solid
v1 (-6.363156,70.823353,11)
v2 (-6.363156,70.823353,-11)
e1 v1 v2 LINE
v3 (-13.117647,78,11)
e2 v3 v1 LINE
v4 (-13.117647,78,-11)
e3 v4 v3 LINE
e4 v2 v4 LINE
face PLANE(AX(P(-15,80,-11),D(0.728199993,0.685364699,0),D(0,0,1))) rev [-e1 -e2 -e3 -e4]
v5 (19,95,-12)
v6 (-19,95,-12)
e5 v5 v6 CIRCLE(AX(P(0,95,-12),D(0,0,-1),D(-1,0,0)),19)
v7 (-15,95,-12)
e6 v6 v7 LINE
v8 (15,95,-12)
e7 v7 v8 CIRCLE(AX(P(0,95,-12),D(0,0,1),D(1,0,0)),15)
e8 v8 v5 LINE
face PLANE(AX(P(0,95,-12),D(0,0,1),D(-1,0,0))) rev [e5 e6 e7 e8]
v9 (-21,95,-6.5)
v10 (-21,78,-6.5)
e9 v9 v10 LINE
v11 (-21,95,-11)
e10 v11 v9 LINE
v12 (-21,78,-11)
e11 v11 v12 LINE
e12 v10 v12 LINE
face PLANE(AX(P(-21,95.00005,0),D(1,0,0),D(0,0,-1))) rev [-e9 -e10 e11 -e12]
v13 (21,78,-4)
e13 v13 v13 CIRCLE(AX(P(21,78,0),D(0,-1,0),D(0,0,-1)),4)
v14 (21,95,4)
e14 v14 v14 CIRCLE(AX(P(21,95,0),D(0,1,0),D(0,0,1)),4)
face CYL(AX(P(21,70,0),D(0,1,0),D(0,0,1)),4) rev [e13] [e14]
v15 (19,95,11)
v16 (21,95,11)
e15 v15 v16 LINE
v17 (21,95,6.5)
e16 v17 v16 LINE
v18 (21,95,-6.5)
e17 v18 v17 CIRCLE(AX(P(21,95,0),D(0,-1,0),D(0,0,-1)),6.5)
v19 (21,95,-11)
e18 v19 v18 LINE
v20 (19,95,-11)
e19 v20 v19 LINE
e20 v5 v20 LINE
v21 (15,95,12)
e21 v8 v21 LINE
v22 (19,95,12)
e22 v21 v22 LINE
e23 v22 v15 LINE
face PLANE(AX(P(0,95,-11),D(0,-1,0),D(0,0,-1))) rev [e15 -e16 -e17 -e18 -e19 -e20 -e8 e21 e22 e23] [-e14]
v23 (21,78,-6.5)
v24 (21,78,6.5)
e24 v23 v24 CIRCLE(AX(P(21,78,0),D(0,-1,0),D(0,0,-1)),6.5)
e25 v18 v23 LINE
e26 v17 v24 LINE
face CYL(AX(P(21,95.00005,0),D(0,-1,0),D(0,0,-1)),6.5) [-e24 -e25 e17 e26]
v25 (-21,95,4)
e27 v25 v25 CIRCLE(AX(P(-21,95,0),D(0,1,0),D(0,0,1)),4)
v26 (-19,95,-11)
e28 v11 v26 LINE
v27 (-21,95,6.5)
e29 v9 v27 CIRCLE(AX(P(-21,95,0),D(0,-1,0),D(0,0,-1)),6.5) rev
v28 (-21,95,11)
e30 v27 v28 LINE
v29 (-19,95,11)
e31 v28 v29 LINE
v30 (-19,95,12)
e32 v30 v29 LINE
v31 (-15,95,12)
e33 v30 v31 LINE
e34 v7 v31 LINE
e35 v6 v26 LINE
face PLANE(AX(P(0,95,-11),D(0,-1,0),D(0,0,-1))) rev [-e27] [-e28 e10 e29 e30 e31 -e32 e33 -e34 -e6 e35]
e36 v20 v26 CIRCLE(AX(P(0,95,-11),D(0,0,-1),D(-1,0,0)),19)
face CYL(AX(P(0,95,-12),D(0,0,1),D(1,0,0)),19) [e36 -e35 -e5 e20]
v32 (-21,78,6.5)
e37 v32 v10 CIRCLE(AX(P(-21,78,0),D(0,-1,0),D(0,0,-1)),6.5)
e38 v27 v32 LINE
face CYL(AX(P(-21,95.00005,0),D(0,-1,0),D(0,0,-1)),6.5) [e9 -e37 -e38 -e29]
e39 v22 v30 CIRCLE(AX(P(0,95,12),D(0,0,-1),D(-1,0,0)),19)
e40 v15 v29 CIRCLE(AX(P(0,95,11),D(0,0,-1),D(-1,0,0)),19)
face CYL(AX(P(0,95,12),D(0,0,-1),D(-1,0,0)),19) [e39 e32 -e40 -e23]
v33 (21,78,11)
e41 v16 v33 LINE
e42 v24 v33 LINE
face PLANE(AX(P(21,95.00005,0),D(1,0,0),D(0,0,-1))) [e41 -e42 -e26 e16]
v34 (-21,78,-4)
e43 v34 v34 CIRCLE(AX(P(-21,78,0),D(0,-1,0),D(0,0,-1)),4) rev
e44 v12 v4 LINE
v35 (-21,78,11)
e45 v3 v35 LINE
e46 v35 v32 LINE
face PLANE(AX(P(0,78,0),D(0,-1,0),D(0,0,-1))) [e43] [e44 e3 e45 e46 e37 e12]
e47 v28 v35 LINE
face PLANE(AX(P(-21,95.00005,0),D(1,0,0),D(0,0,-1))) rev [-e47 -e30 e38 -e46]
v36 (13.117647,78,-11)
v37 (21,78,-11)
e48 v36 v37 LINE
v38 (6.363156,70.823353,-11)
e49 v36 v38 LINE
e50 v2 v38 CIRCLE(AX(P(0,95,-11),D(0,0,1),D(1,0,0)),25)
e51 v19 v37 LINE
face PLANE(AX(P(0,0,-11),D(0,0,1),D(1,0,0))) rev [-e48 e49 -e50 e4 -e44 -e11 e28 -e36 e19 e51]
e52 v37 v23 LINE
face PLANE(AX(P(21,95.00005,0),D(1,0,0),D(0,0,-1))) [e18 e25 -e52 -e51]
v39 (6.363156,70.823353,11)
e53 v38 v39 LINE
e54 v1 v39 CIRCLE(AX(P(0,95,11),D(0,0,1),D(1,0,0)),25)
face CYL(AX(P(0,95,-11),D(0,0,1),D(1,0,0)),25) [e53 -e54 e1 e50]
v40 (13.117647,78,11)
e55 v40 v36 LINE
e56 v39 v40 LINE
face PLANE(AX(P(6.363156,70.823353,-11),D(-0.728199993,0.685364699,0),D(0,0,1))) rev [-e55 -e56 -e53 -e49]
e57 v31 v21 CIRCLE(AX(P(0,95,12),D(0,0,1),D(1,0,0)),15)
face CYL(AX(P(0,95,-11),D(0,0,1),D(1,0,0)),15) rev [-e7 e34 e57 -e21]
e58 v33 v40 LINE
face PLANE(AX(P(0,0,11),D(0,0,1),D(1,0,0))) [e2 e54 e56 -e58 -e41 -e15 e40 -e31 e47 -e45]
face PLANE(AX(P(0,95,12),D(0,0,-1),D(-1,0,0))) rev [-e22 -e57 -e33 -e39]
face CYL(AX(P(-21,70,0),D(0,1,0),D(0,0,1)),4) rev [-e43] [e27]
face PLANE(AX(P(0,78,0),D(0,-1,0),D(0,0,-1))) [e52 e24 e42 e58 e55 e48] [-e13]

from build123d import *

# Parameters (mm, degrees)
EXTRUDE_2_DEPTH      = 11
EXTRUDE_2_DEPTH_BACK = 11
EXTRUDE_3_DEPTH      = 1
SKETCH_9_R           = 4
CUT_EXTRUDE_5_DEPTH  = 15
CUT_EXTRUDE_6_DEPTH  = 15
CHAMFER_1_SIZE       = 5
CHAMFER_2_SIZE       = 5
SKETCH_11_R          = 4
SKETCH_11_W          = 30
SKETCH_11_H          = 22
EXTRUDE_5_DEPTH      = 2


with BuildPart() as part:
    # Эскиз3 → Бобышка-Вытянуть2 (new, two sides: drawn at the far end of the back side and taken through both)
    with BuildSketch(Plane.XY.offset(-EXTRUDE_2_DEPTH_BACK)):
        with BuildLine():
            ThreePointArc((15, 95), (0, 80), (-15, 95))
            Line((-15, 95), (-27.5, 95))
            Line((-27.5, 95), (-27.5, 80))
            Line((-27.5, 80), (-15, 80))
            Line((-15, 80), (-15, 75))
            ThreePointArc((-15, 75), (0, 70), (15, 75))
            Line((15, 75), (15, 80))
            Line((15, 80), (27.5, 80))
            Line((27.5, 80), (27.5, 95))
            Line((27.5, 95), (15, 95))
        make_face()
    extrude(amount=EXTRUDE_2_DEPTH + EXTRUDE_2_DEPTH_BACK)

    # Эскиз5 → Бобышка-Вытянуть3 (add)
    with BuildSketch(Plane.XY.offset(11)):
        with BuildLine():
            Line((-19, 95), (-15, 95))
            ThreePointArc((-15, 95), (0, 80), (15, 95))
            Line((15, 95), (19, 95))
            ThreePointArc((19, 95), (0, 76), (-19, 95))
        make_face()
    extrude_3 = extrude(amount=EXTRUDE_3_DEPTH)

    # Зеркальное отражение1: Бобышка-Вытянуть3 across plane
    add(extrude_3.mirror(Plane.XY))

    # Эскиз9 → Вырез-Вытянуть5 (cut)
    with BuildSketch(Plane(origin=(0, 95, 0), x_dir=(1, 0, 0), z_dir=(0, 1, 0))):
        with Locations(Location((21, 0, 0), (0, 0, 270))):
            Circle(SKETCH_9_R)
        with Locations(Location((-21, 0, 0), (0, 0, 270))):
            Circle(SKETCH_9_R)
    extrude(amount=-CUT_EXTRUDE_5_DEPTH, mode=Mode.SUBTRACT)

    # Эскиз10 → Вырез-Вытянуть6 (cut)
    with BuildSketch(Plane.XZ.offset(-80)):
        with BuildLine():
            Line((27.5, -11), (27.5, 0))
            ThreePointArc((27.5, 0), (25.596194078, -4.596194078), (21, -6.5))
            Line((21, -6.5), (21, -11))
            Line((21, -11), (27.5, -11))
        make_face()
        with BuildLine():
            Line((21, 11), (21, 6.5))
            ThreePointArc((21, 6.5), (25.596194078, 4.596194078), (27.5, 0))
            Line((27.5, 0), (27.5, 11))
            Line((27.5, 11), (21, 11))
        make_face()
    cut_extrude_6 = extrude(amount=-CUT_EXTRUDE_6_DEPTH, mode=Mode.SUBTRACT)

    # Зеркальное отражение2: Вырез-Вытянуть6 across plane
    add(cut_extrude_6.mirror(Plane(origin=(0, 0, 0), x_dir=(0, 0, 1), z_dir=(1, 0, 0))), mode=Mode.SUBTRACT)

    # Фаска1
    # the kernel refuses this chamfer: 20, 5 mm, written as the material it takes off along each edge
    with BuildSketch(Plane(origin=(-15, 75, -36.862227042), x_dir=(0.9002602258420863, -0.4353521858986766, 0), z_dir=(0, 0, 1))) as chamfer_1_piece_1_section:
        with BuildLine():
            Line((9.593719339, 0), (-CHAMFER_1_SIZE * 0.435352185899, CHAMFER_1_SIZE * 0.900260225842))
            Line((-CHAMFER_1_SIZE * 0.435352185899, CHAMFER_1_SIZE * 0.900260225842), (0, 0))
            ThreePointArc((0, 0), (5.175297631, -0.461648225), (9.593719339, 0))
        make_face()
    chamfer_1_piece_1 = extrude(amount=73.724454084, mode=Mode.PRIVATE)
    chamfer_1_piece_1 = split(chamfer_1_piece_1, bisect_by=Plane(origin=(-15, 80, -36.862227042), z_dir=(0, -1, 0)), keep=Keep.TOP, mode=Mode.PRIVATE)
    add(chamfer_1_piece_1, mode=Mode.SUBTRACT)

    # Фаска2
    # the kernel refuses this chamfer: 20, 5 mm, written as the material it takes off along each edge
    with BuildSketch(Plane(origin=(15, 75, -36.862227042), x_dir=(-0.9002602258420859, -0.43535218589867725, 0), z_dir=(0, 0, 1))) as chamfer_2_piece_1:
        with BuildLine():
            Line((9.593719339, 0), (-CHAMFER_2_SIZE * 0.435352185899, -CHAMFER_2_SIZE * 0.900260225842))
            Line((-CHAMFER_2_SIZE * 0.435352185899, -CHAMFER_2_SIZE * 0.900260225842), (0, 0))
            ThreePointArc((0, 0), (5.175297631, 0.461648225), (9.593719339, 0))
        make_face()
    extrude(amount=73.724454084, mode=Mode.SUBTRACT)

    # Эскиз11 → Бобышка-Вытянуть5 (add)
    # profile 1 of 3: a face of its own
    with BuildSketch(Plane.XZ.offset(-80)):
        with BuildLine():
            Line((-15, 11), (-21, 11))
            Line((-21, 11), (-21, 6.5))
            ThreePointArc((-21, 6.5), (-27.5, 0), (-21, -6.5))
            Line((-21, -6.5), (-21, -11))
            Line((-21, -11), (-15, -11))
            Line((-15, -11), (-15, 11))
        make_face()
        with Locations(Location((-21, 0, 0), (0, 0, 90))):
            Circle(SKETCH_11_R, mode=Mode.SUBTRACT)
    # profile 2 of 3: a face of its own
    with BuildSketch(Plane.XZ.offset(-80)):
        with BuildLine():
            Line((21, -11), (21, -6.5))
            ThreePointArc((21, -6.5), (27.5, 0), (21, 6.5))
            Line((21, 6.5), (21, 11))
            Line((21, 11), (15, 11))
            Line((15, 11), (15, -11))
            Line((15, -11), (21, -11))
        make_face()
        with Locations(Location((21, 0, 0), (0, 0, 90))):
            Circle(SKETCH_11_R, mode=Mode.SUBTRACT)
    # profile 3 of 3: a face of its own
    with BuildSketch(Plane.XZ.offset(-80)):
        Rectangle(SKETCH_11_W, SKETCH_11_H)
    extrude(amount=EXTRUDE_5_DEPTH)


solid = part.part
